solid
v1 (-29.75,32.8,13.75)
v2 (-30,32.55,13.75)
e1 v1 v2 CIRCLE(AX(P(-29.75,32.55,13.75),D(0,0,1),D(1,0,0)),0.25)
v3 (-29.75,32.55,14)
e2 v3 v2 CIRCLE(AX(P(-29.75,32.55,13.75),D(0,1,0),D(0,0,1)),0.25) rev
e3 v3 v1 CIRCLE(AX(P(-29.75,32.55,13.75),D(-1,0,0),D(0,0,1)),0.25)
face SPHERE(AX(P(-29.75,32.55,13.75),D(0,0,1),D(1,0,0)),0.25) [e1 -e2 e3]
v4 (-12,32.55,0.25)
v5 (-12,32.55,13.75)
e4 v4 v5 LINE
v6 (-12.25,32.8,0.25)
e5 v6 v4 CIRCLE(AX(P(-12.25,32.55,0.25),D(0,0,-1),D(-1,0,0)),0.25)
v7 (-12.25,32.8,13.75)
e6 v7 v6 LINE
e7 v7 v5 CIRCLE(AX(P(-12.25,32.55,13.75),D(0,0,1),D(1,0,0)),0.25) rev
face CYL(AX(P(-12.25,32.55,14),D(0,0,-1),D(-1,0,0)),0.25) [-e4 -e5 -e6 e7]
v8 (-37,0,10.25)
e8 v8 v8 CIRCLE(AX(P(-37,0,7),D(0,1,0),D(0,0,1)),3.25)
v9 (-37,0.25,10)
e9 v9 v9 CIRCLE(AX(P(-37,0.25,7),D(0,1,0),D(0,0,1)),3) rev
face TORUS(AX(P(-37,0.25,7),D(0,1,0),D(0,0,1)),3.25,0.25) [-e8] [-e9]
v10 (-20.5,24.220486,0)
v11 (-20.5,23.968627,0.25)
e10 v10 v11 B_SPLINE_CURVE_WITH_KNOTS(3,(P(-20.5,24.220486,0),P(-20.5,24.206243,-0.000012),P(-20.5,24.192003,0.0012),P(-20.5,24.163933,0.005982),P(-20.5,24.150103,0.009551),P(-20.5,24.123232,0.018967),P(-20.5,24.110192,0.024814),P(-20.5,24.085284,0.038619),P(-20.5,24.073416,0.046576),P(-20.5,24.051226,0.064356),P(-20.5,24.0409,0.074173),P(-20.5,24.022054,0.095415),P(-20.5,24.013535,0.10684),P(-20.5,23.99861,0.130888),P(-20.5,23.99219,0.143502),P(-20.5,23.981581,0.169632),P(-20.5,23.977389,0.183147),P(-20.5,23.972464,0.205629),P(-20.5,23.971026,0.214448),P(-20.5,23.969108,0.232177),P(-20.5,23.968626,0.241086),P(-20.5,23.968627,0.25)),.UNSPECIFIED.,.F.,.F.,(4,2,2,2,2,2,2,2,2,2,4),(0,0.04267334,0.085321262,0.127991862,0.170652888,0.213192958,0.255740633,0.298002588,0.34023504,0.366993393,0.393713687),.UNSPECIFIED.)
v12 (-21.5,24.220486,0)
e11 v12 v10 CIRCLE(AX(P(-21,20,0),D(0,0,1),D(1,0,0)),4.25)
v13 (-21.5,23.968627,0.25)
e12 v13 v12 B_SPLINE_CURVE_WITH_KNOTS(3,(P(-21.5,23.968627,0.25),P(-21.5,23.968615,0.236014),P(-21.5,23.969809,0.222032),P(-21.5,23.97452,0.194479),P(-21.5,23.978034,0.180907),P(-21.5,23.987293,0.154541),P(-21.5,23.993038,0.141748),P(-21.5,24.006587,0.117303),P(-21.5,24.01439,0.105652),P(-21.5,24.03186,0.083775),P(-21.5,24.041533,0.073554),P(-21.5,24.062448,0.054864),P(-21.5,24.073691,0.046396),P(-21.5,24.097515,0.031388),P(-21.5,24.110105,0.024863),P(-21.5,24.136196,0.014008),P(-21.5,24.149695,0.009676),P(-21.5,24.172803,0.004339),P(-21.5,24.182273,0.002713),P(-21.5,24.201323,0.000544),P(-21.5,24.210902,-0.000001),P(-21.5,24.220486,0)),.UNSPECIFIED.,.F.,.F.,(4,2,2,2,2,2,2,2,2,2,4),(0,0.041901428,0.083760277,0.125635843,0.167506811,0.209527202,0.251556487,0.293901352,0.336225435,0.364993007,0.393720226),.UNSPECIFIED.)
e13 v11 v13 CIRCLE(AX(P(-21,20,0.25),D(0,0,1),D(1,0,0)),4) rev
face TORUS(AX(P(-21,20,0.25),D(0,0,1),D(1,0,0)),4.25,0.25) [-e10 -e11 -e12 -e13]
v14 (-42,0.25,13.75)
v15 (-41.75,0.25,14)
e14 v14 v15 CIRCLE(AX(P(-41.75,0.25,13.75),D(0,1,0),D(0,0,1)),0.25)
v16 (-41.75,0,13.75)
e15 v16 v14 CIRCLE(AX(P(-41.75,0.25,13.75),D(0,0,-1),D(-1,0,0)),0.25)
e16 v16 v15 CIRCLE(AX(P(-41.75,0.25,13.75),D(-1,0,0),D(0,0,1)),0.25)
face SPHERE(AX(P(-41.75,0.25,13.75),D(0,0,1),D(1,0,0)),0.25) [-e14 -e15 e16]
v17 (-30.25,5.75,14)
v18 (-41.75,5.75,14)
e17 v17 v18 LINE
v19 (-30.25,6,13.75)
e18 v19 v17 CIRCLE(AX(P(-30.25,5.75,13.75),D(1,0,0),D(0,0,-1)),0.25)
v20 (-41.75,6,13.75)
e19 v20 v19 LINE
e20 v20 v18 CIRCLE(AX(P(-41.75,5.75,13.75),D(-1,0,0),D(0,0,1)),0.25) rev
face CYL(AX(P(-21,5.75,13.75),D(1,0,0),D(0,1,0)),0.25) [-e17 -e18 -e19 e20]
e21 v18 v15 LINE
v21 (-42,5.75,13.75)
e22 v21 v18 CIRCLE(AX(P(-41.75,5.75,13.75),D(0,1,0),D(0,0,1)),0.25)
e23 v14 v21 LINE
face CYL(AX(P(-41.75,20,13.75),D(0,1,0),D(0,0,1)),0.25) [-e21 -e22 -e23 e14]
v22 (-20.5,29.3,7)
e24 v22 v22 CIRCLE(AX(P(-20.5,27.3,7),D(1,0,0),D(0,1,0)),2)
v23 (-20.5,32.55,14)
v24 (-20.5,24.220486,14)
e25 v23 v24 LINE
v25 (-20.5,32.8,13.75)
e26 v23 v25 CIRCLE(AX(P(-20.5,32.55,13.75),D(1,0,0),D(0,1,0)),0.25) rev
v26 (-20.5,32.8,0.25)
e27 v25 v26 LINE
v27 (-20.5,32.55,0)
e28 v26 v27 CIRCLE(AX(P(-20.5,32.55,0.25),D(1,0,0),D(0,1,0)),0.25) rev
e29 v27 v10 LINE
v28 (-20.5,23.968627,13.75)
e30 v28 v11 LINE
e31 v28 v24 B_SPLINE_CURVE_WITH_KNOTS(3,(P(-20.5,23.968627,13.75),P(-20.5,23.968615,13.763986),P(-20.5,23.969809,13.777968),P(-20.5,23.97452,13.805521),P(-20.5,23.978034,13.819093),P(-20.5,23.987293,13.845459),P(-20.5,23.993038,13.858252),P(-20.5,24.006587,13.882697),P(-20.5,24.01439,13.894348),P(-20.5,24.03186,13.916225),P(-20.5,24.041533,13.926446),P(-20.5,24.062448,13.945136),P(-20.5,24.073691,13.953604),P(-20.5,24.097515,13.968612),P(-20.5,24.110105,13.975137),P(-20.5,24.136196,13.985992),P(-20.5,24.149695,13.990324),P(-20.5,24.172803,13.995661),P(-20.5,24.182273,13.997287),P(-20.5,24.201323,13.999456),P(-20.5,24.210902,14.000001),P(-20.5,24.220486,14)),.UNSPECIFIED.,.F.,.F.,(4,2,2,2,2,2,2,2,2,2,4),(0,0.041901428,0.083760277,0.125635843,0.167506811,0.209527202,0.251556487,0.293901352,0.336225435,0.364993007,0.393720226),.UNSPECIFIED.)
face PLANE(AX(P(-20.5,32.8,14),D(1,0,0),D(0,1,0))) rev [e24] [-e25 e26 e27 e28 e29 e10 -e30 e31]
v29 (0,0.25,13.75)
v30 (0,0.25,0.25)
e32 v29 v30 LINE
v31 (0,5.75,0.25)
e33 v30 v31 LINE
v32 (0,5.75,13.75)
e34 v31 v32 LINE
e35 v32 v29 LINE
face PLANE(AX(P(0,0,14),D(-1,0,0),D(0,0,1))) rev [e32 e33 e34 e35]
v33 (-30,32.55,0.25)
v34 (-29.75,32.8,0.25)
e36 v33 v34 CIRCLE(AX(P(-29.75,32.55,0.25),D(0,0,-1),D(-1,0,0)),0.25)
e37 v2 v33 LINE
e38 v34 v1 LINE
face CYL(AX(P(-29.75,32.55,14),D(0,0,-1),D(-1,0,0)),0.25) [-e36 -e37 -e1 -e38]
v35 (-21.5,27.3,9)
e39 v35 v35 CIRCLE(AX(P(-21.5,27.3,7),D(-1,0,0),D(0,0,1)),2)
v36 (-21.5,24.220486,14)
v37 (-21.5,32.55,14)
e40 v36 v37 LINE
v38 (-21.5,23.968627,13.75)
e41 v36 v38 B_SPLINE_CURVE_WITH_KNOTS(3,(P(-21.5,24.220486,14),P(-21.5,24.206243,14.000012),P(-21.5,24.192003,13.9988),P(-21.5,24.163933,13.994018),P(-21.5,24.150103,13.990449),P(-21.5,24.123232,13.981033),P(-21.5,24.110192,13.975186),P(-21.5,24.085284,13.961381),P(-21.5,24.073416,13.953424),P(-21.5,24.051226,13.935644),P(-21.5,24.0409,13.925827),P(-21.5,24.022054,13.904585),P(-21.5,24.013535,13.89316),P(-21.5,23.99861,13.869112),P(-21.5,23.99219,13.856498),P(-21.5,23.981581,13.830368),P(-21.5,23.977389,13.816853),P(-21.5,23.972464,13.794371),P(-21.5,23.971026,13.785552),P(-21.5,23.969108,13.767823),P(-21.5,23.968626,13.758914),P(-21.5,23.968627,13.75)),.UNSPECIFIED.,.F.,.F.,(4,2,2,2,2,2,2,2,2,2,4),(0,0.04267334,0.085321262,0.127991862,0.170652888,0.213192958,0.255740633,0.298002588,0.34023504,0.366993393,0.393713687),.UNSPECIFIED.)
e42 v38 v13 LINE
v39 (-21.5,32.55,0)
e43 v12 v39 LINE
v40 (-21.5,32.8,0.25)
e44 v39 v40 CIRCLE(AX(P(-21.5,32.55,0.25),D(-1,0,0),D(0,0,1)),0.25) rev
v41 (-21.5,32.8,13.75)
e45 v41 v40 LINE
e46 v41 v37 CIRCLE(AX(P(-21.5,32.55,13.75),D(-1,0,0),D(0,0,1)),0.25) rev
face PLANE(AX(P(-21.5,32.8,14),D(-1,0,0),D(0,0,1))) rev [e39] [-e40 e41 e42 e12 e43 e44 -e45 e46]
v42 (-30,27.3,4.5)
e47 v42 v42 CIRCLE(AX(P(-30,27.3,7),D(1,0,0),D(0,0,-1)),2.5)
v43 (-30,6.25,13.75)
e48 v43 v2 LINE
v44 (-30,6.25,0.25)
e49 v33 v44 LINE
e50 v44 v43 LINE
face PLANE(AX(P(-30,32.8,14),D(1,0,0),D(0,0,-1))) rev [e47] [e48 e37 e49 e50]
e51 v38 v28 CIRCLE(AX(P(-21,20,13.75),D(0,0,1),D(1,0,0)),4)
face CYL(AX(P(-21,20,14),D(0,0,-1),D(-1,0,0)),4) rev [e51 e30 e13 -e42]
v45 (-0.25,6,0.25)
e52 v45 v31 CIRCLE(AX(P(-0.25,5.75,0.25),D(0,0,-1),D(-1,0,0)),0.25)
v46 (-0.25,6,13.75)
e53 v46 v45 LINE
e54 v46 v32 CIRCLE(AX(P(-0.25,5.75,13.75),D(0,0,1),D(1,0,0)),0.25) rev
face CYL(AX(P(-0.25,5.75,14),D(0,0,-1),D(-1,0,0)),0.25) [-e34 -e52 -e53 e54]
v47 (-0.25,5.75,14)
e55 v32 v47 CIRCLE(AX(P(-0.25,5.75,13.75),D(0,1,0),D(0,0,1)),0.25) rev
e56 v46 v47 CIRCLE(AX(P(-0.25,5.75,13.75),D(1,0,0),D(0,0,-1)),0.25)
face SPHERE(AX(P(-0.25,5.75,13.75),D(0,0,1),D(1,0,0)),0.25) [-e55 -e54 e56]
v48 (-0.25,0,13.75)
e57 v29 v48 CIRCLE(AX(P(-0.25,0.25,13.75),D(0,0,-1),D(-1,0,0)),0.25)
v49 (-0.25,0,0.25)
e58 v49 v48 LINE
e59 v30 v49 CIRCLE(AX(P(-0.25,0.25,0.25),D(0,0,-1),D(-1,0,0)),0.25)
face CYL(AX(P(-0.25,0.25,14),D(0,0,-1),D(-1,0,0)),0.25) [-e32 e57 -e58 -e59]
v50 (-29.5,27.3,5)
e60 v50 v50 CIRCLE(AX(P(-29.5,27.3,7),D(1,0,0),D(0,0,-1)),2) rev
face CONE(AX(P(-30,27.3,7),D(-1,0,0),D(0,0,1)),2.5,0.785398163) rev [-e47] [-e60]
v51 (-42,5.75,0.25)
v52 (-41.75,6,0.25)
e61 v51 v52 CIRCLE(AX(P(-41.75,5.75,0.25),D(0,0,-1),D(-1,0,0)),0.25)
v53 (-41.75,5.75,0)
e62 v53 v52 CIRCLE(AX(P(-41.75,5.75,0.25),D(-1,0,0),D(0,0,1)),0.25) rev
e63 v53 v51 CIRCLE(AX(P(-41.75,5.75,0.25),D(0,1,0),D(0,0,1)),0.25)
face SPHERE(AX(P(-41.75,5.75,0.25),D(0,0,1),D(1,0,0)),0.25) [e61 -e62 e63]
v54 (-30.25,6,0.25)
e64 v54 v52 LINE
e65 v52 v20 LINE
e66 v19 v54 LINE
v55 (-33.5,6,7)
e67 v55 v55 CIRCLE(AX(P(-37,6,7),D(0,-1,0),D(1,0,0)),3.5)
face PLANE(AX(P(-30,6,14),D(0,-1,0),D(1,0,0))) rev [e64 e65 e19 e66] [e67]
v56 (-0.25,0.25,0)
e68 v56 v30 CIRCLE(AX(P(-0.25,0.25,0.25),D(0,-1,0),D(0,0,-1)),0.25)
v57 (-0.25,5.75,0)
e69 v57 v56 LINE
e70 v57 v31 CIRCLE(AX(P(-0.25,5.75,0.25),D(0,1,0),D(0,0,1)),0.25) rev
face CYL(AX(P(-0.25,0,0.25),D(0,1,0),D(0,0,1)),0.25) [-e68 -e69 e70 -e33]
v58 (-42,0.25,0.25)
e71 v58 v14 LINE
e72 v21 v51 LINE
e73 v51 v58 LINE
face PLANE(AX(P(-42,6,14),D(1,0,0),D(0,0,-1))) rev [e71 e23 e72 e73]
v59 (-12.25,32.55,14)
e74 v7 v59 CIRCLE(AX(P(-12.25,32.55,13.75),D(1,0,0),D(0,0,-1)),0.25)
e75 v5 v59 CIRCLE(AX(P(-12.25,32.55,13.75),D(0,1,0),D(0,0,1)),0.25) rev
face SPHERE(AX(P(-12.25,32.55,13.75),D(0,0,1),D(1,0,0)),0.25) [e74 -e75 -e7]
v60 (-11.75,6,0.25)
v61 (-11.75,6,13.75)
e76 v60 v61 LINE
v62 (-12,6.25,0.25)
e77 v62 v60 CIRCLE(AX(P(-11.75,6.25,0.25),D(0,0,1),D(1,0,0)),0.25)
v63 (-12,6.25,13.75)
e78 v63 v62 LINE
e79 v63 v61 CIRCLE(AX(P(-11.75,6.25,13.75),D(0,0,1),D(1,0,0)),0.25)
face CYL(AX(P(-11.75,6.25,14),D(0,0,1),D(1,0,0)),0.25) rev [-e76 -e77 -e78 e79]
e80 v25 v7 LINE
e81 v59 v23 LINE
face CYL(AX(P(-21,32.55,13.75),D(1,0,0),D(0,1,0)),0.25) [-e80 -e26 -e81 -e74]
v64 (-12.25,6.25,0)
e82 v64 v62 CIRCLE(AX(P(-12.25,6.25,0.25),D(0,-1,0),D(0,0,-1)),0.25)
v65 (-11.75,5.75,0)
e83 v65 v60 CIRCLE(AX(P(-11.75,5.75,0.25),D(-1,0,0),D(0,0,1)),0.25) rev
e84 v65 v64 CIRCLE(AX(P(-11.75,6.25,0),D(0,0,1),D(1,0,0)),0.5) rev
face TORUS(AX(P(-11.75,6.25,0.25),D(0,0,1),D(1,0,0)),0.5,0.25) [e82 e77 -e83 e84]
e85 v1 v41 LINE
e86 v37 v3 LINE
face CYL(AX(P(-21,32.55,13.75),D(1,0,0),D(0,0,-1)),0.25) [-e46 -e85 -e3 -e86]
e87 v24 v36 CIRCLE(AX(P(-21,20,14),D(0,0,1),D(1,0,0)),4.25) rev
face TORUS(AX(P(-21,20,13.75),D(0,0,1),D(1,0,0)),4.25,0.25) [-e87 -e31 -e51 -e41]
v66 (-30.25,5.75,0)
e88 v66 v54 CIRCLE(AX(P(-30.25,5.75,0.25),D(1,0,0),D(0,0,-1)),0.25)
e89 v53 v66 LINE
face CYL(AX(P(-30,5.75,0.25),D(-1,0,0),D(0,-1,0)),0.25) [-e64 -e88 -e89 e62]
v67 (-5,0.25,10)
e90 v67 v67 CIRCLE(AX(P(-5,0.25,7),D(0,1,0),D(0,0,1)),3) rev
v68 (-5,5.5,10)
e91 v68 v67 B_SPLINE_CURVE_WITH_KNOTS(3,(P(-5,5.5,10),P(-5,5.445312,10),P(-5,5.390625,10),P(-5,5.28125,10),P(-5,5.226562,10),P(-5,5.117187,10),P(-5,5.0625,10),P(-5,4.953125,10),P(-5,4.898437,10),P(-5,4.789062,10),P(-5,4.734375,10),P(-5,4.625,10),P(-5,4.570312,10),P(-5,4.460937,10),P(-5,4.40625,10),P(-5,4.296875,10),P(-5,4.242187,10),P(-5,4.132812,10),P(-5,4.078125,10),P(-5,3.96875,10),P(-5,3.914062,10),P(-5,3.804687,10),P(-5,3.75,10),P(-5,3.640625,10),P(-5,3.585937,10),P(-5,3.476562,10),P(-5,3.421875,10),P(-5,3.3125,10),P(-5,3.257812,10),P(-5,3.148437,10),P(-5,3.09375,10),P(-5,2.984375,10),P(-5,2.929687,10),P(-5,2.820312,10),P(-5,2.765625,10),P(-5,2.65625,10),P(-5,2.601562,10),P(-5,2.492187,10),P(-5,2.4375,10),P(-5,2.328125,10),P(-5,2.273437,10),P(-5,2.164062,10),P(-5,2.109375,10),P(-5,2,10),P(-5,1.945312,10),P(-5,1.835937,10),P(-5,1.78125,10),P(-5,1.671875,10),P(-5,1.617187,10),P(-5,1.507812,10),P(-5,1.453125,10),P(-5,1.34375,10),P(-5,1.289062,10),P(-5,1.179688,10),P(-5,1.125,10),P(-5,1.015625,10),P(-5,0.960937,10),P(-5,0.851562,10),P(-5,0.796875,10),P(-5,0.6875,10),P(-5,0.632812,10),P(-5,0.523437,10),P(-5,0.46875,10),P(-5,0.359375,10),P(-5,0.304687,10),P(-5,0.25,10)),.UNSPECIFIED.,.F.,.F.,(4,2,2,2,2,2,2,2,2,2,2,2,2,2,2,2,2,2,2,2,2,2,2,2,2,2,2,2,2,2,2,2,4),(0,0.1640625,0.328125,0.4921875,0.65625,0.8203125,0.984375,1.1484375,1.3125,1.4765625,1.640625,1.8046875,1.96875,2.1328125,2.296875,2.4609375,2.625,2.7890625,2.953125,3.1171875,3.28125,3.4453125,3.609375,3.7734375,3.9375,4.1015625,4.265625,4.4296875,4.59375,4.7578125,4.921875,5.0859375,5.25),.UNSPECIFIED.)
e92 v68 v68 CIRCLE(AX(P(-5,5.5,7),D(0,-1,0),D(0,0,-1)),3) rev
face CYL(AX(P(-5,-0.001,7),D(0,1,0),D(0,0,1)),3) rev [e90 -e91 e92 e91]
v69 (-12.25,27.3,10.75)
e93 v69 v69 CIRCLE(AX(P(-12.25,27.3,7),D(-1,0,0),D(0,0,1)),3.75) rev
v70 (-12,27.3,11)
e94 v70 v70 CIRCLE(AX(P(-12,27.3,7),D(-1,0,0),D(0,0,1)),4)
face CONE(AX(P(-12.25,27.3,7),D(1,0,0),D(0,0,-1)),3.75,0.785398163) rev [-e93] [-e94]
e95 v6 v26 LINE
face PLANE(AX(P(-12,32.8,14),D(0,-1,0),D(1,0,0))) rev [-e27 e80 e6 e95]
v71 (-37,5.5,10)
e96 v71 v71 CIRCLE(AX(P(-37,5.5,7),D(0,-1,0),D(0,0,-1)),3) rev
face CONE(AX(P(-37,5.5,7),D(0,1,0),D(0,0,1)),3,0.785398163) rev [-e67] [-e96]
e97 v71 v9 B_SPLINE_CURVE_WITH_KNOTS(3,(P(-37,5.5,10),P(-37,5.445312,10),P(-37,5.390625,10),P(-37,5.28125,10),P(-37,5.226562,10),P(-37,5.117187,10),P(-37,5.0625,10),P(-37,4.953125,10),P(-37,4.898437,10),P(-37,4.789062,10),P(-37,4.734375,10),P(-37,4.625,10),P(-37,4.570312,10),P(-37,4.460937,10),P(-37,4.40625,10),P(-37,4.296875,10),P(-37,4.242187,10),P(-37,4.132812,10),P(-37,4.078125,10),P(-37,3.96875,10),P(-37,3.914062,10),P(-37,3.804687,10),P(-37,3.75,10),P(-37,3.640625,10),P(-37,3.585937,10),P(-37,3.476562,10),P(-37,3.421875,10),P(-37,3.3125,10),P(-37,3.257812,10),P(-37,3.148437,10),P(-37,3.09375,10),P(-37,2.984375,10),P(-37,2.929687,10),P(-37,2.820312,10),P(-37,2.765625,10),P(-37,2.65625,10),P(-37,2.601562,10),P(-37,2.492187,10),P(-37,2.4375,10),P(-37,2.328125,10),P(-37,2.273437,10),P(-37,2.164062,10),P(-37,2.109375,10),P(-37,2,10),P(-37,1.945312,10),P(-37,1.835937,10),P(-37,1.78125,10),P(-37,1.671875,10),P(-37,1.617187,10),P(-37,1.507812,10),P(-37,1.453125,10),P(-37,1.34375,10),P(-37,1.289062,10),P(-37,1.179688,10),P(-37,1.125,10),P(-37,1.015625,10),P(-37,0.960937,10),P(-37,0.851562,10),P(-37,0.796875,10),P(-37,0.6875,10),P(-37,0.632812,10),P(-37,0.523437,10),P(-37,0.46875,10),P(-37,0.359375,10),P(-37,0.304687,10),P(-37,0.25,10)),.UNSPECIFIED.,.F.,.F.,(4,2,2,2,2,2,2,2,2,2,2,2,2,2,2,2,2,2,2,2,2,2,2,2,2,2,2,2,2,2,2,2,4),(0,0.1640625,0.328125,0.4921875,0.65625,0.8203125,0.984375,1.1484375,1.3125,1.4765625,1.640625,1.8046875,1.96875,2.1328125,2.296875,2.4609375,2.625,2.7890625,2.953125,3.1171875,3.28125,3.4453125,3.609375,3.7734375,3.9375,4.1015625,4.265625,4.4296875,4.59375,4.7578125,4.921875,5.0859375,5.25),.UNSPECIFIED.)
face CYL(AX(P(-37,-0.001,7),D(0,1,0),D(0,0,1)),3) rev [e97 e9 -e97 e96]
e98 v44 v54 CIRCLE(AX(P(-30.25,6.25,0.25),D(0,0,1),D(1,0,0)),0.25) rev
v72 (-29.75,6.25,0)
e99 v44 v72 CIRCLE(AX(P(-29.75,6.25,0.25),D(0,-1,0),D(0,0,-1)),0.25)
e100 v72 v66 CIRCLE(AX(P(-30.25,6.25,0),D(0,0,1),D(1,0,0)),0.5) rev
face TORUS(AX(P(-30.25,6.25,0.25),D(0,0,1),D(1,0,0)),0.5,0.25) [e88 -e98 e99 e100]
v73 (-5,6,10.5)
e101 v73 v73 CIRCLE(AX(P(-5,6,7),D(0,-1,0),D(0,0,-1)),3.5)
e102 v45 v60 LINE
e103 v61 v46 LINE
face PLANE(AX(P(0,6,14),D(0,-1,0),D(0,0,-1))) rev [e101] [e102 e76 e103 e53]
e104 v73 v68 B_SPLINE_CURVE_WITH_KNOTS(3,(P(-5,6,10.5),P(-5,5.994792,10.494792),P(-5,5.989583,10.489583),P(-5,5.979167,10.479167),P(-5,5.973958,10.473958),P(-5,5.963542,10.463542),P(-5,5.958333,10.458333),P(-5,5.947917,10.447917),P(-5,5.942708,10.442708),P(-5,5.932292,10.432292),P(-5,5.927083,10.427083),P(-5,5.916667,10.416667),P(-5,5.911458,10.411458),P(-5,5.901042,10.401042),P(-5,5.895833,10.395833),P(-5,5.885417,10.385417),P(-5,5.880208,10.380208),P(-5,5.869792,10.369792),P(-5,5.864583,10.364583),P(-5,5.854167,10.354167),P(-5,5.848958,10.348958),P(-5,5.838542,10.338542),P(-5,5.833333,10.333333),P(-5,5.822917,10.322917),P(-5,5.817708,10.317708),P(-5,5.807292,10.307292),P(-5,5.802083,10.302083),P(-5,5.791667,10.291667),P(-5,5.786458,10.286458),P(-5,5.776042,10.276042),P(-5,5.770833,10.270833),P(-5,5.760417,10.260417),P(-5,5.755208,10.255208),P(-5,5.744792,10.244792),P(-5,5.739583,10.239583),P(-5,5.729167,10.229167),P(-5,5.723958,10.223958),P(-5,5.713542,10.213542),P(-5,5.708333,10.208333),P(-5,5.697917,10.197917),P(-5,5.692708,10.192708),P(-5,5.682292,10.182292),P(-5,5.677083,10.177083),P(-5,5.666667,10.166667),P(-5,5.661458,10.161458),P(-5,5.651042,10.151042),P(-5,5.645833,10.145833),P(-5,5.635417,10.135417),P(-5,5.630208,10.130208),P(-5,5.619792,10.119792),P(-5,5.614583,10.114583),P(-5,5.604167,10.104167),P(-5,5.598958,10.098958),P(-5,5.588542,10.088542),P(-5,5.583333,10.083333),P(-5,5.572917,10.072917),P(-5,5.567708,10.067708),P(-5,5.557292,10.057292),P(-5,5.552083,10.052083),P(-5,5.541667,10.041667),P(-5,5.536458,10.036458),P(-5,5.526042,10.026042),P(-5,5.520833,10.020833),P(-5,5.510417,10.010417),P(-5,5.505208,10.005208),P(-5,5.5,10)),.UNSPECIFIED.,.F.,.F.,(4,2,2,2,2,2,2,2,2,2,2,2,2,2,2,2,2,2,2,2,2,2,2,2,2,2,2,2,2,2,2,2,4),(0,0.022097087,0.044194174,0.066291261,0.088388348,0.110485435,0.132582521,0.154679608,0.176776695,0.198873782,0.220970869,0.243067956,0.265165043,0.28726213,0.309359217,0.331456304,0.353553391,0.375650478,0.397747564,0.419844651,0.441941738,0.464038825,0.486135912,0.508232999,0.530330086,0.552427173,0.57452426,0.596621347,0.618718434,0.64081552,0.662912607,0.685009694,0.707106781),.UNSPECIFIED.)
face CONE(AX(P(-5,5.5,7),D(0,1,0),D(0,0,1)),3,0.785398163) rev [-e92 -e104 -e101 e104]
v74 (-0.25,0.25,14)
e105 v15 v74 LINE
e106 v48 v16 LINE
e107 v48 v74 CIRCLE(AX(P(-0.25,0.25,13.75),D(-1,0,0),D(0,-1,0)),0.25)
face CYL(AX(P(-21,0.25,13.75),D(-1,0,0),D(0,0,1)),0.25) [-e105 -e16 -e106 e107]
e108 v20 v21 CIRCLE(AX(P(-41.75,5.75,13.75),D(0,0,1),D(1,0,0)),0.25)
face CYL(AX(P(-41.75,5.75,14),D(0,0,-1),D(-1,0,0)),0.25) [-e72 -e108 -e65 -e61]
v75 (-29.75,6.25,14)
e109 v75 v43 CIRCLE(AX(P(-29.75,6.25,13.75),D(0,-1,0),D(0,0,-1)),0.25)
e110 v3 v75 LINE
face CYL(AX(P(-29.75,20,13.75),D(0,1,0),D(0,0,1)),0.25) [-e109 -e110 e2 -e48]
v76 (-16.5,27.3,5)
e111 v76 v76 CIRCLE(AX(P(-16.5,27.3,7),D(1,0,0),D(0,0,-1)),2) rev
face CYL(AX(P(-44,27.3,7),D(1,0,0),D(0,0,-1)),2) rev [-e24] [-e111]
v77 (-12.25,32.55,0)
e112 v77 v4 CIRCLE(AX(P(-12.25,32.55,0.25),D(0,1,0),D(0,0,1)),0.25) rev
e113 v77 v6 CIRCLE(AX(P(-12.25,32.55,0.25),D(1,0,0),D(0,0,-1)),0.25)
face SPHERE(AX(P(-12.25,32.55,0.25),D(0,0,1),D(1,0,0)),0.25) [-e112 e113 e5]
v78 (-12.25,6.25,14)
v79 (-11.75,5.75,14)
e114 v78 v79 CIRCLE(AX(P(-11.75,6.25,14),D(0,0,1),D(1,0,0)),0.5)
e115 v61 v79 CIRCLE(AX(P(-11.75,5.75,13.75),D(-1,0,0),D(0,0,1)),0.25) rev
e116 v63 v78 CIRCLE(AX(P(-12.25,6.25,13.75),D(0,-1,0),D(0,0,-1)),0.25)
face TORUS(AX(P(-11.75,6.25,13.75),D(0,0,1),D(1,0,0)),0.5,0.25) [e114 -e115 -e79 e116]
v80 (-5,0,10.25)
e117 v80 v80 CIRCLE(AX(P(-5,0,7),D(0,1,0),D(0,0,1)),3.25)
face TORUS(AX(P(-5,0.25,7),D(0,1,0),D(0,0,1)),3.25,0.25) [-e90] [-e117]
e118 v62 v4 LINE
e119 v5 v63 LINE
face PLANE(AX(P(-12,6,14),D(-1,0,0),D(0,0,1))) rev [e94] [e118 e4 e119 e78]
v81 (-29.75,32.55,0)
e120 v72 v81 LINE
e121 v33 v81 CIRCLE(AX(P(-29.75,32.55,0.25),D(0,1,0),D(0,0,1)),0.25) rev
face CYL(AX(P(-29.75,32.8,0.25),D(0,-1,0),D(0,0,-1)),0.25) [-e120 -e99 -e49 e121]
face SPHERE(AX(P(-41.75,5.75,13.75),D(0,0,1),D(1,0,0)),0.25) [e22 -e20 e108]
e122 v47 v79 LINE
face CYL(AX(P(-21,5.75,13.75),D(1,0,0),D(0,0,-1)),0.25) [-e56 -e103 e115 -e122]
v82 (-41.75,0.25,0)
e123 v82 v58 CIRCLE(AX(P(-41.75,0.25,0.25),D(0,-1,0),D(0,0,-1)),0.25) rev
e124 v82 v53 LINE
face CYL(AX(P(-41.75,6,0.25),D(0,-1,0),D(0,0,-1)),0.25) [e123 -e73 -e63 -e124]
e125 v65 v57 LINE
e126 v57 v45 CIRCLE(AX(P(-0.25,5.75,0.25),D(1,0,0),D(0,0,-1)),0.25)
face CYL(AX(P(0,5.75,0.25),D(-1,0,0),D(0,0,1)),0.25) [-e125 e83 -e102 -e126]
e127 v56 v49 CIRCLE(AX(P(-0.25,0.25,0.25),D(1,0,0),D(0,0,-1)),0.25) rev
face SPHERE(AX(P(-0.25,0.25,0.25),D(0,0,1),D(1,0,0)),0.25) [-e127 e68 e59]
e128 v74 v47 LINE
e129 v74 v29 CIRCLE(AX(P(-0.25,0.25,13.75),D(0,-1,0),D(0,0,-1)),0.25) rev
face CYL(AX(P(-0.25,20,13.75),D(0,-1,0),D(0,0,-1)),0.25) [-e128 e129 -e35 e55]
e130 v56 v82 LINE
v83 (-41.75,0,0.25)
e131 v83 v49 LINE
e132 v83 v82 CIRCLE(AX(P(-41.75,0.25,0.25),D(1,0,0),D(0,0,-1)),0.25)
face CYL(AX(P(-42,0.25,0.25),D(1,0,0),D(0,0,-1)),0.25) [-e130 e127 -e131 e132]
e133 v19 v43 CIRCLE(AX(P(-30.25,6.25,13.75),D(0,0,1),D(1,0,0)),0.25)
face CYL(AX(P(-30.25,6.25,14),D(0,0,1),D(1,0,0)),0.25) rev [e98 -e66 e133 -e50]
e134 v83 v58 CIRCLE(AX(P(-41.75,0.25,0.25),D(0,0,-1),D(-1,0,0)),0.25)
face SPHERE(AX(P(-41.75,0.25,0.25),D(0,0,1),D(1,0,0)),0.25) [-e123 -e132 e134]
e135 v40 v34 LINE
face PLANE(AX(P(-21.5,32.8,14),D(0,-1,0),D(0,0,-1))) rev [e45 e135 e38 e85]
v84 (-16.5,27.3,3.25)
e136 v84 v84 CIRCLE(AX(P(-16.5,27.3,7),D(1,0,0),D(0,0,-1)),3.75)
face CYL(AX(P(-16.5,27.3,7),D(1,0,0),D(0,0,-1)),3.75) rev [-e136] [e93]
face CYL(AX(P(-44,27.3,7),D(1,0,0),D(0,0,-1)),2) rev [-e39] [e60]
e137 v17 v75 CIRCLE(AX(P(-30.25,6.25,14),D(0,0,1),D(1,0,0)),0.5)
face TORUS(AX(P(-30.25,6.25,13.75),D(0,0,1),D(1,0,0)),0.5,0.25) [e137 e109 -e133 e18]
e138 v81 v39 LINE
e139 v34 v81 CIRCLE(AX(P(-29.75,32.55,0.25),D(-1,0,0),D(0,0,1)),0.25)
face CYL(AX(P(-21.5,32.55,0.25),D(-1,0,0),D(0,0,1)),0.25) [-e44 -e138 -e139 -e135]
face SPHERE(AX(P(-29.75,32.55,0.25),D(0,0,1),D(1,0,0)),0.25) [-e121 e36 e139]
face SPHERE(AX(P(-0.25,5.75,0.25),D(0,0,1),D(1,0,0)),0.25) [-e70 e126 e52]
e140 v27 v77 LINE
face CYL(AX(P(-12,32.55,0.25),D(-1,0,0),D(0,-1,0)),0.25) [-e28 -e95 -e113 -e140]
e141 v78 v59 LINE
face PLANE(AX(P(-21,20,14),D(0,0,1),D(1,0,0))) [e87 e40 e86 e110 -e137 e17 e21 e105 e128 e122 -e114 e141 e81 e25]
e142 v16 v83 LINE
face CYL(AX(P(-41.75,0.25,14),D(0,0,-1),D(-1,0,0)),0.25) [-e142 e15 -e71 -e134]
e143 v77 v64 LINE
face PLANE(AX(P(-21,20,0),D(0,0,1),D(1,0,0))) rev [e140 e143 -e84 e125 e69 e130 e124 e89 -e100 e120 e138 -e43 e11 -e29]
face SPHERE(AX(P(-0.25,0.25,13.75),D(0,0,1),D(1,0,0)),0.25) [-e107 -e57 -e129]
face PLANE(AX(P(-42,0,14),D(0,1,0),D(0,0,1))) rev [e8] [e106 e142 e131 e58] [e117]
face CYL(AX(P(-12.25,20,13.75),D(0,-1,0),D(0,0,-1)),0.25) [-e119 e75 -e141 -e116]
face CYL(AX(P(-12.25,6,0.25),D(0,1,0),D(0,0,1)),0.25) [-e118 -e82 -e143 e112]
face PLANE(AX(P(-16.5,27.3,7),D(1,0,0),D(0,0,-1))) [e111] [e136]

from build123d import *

# Parameters (mm, degrees)
BOSS_EXTRUDE1_DEPTH = 14
CUT_EXTRUDE1_REACH  = 53.752
SKETCH2_R           = 3
SKETCH5_R           = 2
CUT_EXTRUDE2_DEPTH  = 32
SKETCH6_R           = 3.75
CUT_EXTRUDE3_DEPTH  = 4.5
CHAMFER2_SIZE       = 0.25
FILLET1_R           = 0.25
FILLET2_R           = 0.25
CHAMFER3_SIZE       = 0.5
CHAMFER4_SIZE       = 0.5
FILLET3_R           = 0.25
FILLET4_R           = 0.25


with BuildPart() as part:
    # Sketch1 → Boss-Extrude1 (new body)
    with BuildSketch(Plane.XY):
        with BuildLine():
            Line((0, 0), (0, 6))
            Line((0, 6), (-12, 6))
            Line((-12, 6), (-12, 32.8))
            Line((-12, 32.8), (-20.5, 32.8))
            Line((-20.5, 32.8), (-20.5, 23.968626967))
            ThreePointArc((-20.5, 23.968626967), (-21, 16), (-21.5, 23.968626967))
            Line((-21.5, 23.968626967), (-21.5, 32.8))
            Line((-21.5, 32.8), (-30, 32.8))
            Line((-30, 32.8), (-30, 6))
            Line((-30, 6), (-42, 6))
            Line((-42, 6), (-42, 0))
            Line((-42, 0), (0, 0))
        make_face()
    extrude(amount=BOSS_EXTRUDE1_DEPTH)

    # Sketch2 → Cut-Extrude1 (cut, up to next)
    with BuildSketch(Plane(origin=(0, 6, 0), x_dir=(1, 0, 0), z_dir=(0, 1, 0)), mode=Mode.PRIVATE) as cut_extrude1_sk1:
        with Locations(Location((-5, -7, 0), (0, 0, 270))):
            Circle(SKETCH2_R)
    cut_extrude1_tool1 = extrude(cut_extrude1_sk1.sketch, amount=-CUT_EXTRUDE1_REACH, mode=Mode.PRIVATE) & part.part
    # Sketch2 → Cut-Extrude1 (cut, up to next)
    with BuildSketch(Plane(origin=(0, 6, 0), x_dir=(1, 0, 0), z_dir=(0, 1, 0)), mode=Mode.PRIVATE) as cut_extrude1_sk2:
        with Locations(Location((-37, -7, 0), (0, 0, 270))):
            Circle(SKETCH2_R)
    cut_extrude1_tool2 = extrude(cut_extrude1_sk2.sketch, amount=-CUT_EXTRUDE1_REACH, mode=Mode.PRIVATE) & part.part
    add(cut_extrude1_tool1.solids().sort_by_distance((-5, 6, 7))[0], mode=Mode.SUBTRACT)
    add(cut_extrude1_tool2.solids().sort_by_distance((-37, 6, 7))[0], mode=Mode.SUBTRACT)

    # Sketch5 → Cut-Extrude2 (cut)
    with BuildSketch(Plane(origin=(-12, 0, 0), x_dir=(0, 0, -1), z_dir=(1, 0, 0))):
        with Locations((-7, 27.3)):
            Circle(SKETCH5_R)
    extrude(amount=-CUT_EXTRUDE2_DEPTH, mode=Mode.SUBTRACT)

    # Sketch6 → Cut-Extrude3 (cut)
    with BuildSketch(Plane(origin=(-12, 0, 0), x_dir=(0, 0, -1), z_dir=(1, 0, 0))):
        with Locations((-7, 27.3)):
            Circle(SKETCH6_R)
    extrude(amount=-CUT_EXTRUDE3_DEPTH, mode=Mode.SUBTRACT)

    # Chamfer2
    chamfer2_edges = [part.edges().sort_by_distance(p)[0] for p in [
        (-12, 27.3, 10.75),
    ]]
    chamfer(chamfer2_edges, length=CHAMFER2_SIZE)

    # Fillet1
    fillet1_edges = [part.edges().sort_by_distance(p)[0] for p in [
        (-21, 16, 0),
        (-21, 16, 14),
    ]]
    fillet(fillet1_edges, radius=FILLET1_R)

    # Fillet2
    fillet2_edges = [part.edges().sort_by_distance(p)[0] for p in [
        (-5, 0, 4),
        (-37, 0, 4),
    ]]
    fillet(fillet2_edges, radius=FILLET2_R)

    # Chamfer3
    chamfer3_edges = [part.edges().sort_by_distance(p)[0] for p in [
        (-5, 6, 4),
        (-37, 6, 4),
    ]]
    chamfer(chamfer3_edges, length=CHAMFER3_SIZE)

    # Chamfer4
    chamfer4_edges = [part.edges().sort_by_distance(p)[0] for p in [
        (-30, 27.3, 9),
    ]]
    chamfer(chamfer4_edges, length=CHAMFER4_SIZE)

    # Fillet3
    fillet3_edges = [part.edges().sort_by_distance(p)[0] for p in [
        (-6, 6, 14),
        (-42, 3, 0),
        (-36, 6, 0),
        (-30, 19.4, 0),
        (-25.75, 32.8, 0),
        (-12, 19.4, 14),
        (-16.25, 32.8, 0),
        (-12, 19.4, 0),
        (-6, 6, 0),
        (0, 3, 0),
        (-21, 0, 0),
        (-16.25, 32.8, 14),
        (-42, 6, 7),
        (-30, 6, 7),
        (-30, 32.8, 7),
        (-12, 32.8, 7),
        (-12, 6, 7),
        (0, 6, 7),
        (0, 0, 7),
        (-25.75, 32.8, 14),
        (-30, 19.4, 14),
        (-36, 6, 14),
        (-42, 3, 14),
        (0, 3, 14),
    ]]
    fillet(fillet3_edges, radius=FILLET3_R)

    # Fillet4
    # the kernel refuses this fillet: 0.25 mm, written as the material it takes off along each edge
    with BuildSketch(Plane(origin=(-0.25, 0.25, 13.75), x_dir=(0, -1, 0), z_dir=(0, 0, 1))) as fillet4_piece_1_section:
        Polygon((0, 0), (FILLET4_R, 0), (FILLET4_R, FILLET4_R), (0, FILLET4_R), align=None)
    fillet4_piece_1 = extrude(amount=FILLET4_R, mode=Mode.PRIVATE)
    fillet4_piece_1 = fillet4_piece_1 - Plane(origin=(-0.25, 0.25, 13.75), x_dir=(-0.7071067811865475, 0.7071067811865475, 0), z_dir=(0, 0, 1)) * Sphere(FILLET4_R, mode=Mode.PRIVATE)
    add(fillet4_piece_1, mode=Mode.SUBTRACT)
    with BuildSketch(Plane(origin=(-41.75, 0.25, 0.25), x_dir=(-1, 0, 0), z_dir=(0, -1, 0))) as fillet4_piece_2_section:
        Polygon((0, 0), (FILLET4_R, 0), (FILLET4_R, FILLET4_R), (0, FILLET4_R), align=None)
    fillet4_piece_2 = extrude(amount=FILLET4_R, mode=Mode.PRIVATE)
    fillet4_piece_2 = fillet4_piece_2 - Plane(origin=(-41.75, 0.25, 0.25), x_dir=(0.7071067811865475, 0, 0.7071067811865475), z_dir=(0, -1, 0)) * Sphere(FILLET4_R, mode=Mode.PRIVATE)
    add(fillet4_piece_2, mode=Mode.SUBTRACT)
    with BuildSketch(Plane(origin=(-42, 0, 0.25), x_dir=(1, 0, 0), z_dir=(0, 0, 1))) as fillet4_piece_3:
        with BuildLine():
            CenterArc((FILLET4_R, FILLET4_R), FILLET4_R, 180, 90)
            Line((0, FILLET4_R), (0, 0))
            Line((0, 0), (FILLET4_R, 0))
        make_face()
    extrude(amount=13.5, mode=Mode.SUBTRACT)
    with BuildSketch(Plane(origin=(-41.75, 0, 13.75), x_dir=(0, 0, 1), z_dir=(1, 0, 0))) as fillet4_piece_4:
        with BuildLine():
            CenterArc((0.25 - FILLET4_R, -FILLET4_R), FILLET4_R, 0, 90)
            Line((0.25, -FILLET4_R), (0.25, 0))
            Line((0.25, 0), (0.25 - FILLET4_R, 0))
        make_face()
    revolve(axis=Axis((-41.75, 0, 13.75), (0, -1, 0)), revolution_arc=90, mode=Mode.SUBTRACT)
    with BuildSketch(Plane(origin=(-41.75, 0, 14), x_dir=(0, 1, 0), z_dir=(1, 0, 0))) as fillet4_piece_5:
        with BuildLine():
            CenterArc((FILLET4_R, -FILLET4_R), FILLET4_R, 90, 90)
            Line((0, -FILLET4_R), (0, 0))
            Line((0, 0), (FILLET4_R, 0))
        make_face()
    extrude(amount=41.5, mode=Mode.SUBTRACT)


solid = part.part
